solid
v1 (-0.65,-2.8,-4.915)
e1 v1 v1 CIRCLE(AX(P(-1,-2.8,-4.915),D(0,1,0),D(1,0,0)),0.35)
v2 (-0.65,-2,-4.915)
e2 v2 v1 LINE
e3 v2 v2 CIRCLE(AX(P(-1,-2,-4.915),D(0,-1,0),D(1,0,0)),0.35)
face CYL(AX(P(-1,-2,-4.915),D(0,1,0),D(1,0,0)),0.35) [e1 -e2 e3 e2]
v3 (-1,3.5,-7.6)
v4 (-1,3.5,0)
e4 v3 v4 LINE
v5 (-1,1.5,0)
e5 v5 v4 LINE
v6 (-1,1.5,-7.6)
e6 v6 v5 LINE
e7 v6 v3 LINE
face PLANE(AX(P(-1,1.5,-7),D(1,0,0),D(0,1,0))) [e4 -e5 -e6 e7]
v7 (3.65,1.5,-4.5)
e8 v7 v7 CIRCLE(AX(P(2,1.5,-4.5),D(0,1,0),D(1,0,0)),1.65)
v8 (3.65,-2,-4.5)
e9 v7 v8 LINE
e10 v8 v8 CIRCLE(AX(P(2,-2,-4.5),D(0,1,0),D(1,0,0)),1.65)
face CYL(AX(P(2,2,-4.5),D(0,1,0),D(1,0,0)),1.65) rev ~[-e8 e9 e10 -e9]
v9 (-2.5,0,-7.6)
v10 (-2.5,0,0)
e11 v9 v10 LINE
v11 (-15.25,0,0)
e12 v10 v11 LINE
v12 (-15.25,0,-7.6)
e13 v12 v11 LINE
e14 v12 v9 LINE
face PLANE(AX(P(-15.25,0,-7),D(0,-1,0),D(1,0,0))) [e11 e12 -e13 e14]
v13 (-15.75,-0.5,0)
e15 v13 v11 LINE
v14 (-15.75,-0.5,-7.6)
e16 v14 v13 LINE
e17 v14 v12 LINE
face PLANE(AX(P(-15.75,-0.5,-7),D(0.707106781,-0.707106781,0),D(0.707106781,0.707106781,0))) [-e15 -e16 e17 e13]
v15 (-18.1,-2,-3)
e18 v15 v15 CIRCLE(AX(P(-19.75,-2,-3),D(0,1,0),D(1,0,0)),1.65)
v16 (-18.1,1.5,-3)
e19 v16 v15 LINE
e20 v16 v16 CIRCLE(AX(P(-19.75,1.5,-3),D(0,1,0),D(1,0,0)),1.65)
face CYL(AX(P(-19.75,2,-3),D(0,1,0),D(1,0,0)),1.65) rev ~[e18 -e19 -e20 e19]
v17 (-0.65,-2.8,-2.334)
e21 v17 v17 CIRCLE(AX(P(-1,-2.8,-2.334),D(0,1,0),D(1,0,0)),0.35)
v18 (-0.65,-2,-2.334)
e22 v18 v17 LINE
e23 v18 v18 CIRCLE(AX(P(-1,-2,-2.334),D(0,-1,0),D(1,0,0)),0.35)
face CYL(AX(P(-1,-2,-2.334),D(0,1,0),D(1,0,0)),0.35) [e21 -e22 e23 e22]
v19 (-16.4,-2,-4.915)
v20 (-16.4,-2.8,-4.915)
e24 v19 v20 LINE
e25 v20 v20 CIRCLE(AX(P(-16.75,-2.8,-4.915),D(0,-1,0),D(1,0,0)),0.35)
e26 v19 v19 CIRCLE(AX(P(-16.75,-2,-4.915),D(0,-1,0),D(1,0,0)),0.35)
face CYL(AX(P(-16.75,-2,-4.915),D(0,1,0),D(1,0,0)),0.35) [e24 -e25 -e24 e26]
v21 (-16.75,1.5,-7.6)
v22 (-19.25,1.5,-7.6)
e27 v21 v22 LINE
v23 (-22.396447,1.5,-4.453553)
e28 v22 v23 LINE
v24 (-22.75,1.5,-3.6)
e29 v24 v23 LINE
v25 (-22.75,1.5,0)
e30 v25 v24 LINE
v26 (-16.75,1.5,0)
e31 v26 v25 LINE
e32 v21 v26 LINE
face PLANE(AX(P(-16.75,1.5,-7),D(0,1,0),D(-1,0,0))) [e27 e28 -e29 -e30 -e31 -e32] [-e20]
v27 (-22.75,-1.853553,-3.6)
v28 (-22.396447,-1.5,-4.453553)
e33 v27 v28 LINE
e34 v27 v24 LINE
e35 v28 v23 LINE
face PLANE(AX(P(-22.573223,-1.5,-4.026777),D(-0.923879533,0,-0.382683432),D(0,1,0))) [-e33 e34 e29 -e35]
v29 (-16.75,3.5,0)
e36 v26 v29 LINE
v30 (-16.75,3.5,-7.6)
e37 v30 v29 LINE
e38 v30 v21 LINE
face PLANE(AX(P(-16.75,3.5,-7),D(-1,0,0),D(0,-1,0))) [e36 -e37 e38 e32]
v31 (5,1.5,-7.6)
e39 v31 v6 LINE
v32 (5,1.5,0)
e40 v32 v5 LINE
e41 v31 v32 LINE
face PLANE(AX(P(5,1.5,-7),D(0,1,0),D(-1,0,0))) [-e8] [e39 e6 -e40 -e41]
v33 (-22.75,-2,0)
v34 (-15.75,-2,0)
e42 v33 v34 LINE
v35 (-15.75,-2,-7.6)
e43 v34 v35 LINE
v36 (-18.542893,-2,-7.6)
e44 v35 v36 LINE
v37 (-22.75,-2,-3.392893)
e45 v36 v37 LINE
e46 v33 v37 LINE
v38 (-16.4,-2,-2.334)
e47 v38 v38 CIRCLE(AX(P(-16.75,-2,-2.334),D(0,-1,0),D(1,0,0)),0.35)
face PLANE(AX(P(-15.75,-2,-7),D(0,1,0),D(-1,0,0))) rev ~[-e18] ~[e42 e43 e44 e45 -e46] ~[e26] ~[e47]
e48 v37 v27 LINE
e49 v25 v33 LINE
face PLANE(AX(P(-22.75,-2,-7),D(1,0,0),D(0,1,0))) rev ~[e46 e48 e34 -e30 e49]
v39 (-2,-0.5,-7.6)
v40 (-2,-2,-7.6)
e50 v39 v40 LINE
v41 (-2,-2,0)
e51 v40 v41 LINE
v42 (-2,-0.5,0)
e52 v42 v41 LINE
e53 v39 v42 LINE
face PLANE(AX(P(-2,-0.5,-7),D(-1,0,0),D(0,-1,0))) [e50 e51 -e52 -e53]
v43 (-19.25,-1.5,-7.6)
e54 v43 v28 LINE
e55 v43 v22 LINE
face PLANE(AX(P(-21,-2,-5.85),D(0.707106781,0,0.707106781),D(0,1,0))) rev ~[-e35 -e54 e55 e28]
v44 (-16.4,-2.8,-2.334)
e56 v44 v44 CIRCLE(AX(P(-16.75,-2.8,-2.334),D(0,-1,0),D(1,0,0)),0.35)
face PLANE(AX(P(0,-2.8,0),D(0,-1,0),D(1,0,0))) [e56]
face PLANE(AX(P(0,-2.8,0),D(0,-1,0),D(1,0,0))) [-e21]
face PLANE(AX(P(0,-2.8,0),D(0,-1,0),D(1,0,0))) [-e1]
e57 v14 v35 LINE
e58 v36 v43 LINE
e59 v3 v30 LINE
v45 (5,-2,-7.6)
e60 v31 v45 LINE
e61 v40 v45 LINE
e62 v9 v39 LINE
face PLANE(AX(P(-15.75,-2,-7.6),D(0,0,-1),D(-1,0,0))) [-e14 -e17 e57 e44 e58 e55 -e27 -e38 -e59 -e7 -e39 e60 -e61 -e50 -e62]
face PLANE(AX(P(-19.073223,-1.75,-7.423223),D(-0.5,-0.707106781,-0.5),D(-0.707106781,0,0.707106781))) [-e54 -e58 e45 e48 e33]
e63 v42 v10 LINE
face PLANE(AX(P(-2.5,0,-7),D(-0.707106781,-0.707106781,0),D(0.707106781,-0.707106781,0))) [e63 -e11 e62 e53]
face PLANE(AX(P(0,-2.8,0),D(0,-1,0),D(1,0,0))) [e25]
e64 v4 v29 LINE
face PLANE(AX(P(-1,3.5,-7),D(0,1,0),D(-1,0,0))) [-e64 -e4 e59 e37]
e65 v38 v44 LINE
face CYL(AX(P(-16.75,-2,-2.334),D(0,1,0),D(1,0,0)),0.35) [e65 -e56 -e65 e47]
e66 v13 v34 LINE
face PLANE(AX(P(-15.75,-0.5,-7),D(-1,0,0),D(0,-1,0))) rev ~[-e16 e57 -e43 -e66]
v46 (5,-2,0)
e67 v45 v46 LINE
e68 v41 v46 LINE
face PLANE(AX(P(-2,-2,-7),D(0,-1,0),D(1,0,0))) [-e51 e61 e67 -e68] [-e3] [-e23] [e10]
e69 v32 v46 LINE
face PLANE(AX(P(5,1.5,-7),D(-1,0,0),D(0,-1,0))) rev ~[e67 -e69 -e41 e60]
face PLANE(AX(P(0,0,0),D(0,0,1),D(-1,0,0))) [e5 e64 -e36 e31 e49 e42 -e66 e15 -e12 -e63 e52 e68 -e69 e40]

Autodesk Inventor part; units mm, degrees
ref_plane "YZ Plane" through (0, 0, 0) normal (1, 0, 0) x (0, 1, 0)
ref_plane "XZ Plane" through (0, 0, 0) normal (0, 1, 0) x (-1, 0, 0)
ref_plane "XY Plane" through (0, 0, 0) normal (0, 0, 1) x (1, 0, 0)
sketch "Sketch1" plane through (0, 0, 0) normal (0, 1, 0) x (-1, 0, 0)
  line L0 (0, 0) -> (17.75, 0)
  line L1 (17.75, 0) -> (17.75, -7)
  line L2 (17.75, -7) -> (0, -7)
  line L3 (0, -7) -> (0, 0)
  dimension "d0" = 17.75
  dimension "d1" = 7
extrude "Extrusion1" add sketch "Sketch1" along normal blind 2
sketch "Sketch2" plane through (0, 0, 0) normal (0, -1, 0) x (1, 0, 0)
  line L0 (-17.75, 0) -> (0, 0) projected
  line L1 (0, -7) -> (-17.75, -7) projected
  line L2 (0, 0) -> (-2, 0)
  line L3 (-2, 0) -> (-2, -7)
  line L4 (-2, -7) -> (0, -7)
  line L5 (0, -7) -> (0, 0)
  line L6 (-17.75, -7) -> (-17.75, 0) projected
  line L7 (-17.75, 0) -> (-15.75, 0)
  line L8 (-15.75, 0) -> (-15.75, -7)
  line L9 (-15.75, -7) -> (-17.75, -7)
  line L10 (-17.75, -7) -> (-17.75, 0)
  dimension "d4" = 2
  dimension "d5" = 2
extrude "Extrusion2" add sketch "Sketch2" along normal blind 2 contours L0 L8 L1 L6 | L0 L5 L1 L3
sketch "Sketch3" plane through (0, -2, 0) normal (0, -1, 0) x (1, 0, 0)
  line L0 (0, 0) -> (-1, 0)
  line L1 (0, 0) -> (-2, 0) projected
  line L2 (-1, 0) -> (-1, -2.334)
  line L3 (-1, 0) -> (-1, -4.915)
  circle A0 centre (-1, -2.334) radius 0.35
  circle A1 centre (-1, -4.915) radius 0.35
  line L4 (0, 0) -> (0, -7) projected
  line L5 (-17.75, -7) -> (-17.75, 0) projected
  line L6 (0, 0) -> (-17.75, 0)
  line L7 (-15.75, 0) -> (-2, 0) projected
  line L8 (-8.875, 0) -> (-8.875, -0.7455)
  circle A2 centre (-16.75, -2.334) radius 0.35
  circle A3 centre (-16.75, -4.915) radius 0.35
  dimension "d8" = 1
  dimension "d9" = 2.334
  dimension "d10" = 4.915
  dimension "d11" = 0.7
  dimension "d12" = 0.7
extrude "Extrusion3" add sketch "Sketch3" along normal blind 0.8
sketch "Sketch4" plane through (0, 2, -7) normal (0, 0, -1) x (-1, 0, 0)
  line L0 (0, 0) -> (0, -4) projected
  line L1 (0, -4) -> (-4, -4)
  line L2 (-4, -4) -> (-4, -2)
  line L3 (-4, -2) -> (0, -2)
  line L4 (0, -2) -> (0, -4)
  line L5 (17.75, -4) -> (17.75, 0) projected
  line L6 (17.75, -4) -> (21.75, -4)
  line L7 (21.75, -4) -> (21.75, -2)
  line L8 (21.75, -2) -> (17.75, -2)
  line L9 (17.75, -2) -> (17.75, -4)
  dimension "d19" = 4
  dimension "d20" = 2
  dimension "d21" = 4
  dimension "d22" = 2
extrude "Extrusion4" add sketch "Sketch4" against normal blind 7
sketch "Sketch6" plane through (0, 0, -7) normal (0, 1, 0) x (1, 0, 0)
  line L0 (0, -7) -> (0, 0) projected
  line L1 (4, 0) -> (4, -7) projected
  line L2 (0, -7) -> (4, -7)
  line L3 (4, -7) -> (4, 0)
  line L4 (4, 0) -> (0, 0)
  line L5 (0, 0) -> (0, -7)
  line L6 (-15.75, -7) -> (-21.75, -7) projected
  line L7 (0, 0) -> (-17.75, 0) projected
  line L8 (-21.75, -7) -> (-17.75, -7)
  line L9 (-17.75, -7) -> (-17.75, 0)
  line L10 (-17.75, 0) -> (-21.75, 0)
  line L11 (-21.75, 0) -> (-21.75, -7)
extrude "Extrusion5" add sketch "Sketch6" along normal blind 2
sketch "Sketch8" plane through (0, 2, 0) normal (0, 1, 0) x (1, 0, 0)
  line L0 (4, 0) -> (4, 7) projected
  line L1 (4, 0) -> (5, 0)
  line L2 (5, 0) -> (5, 7)
  line L3 (5, 7) -> (4, 7)
  line L4 (4, 7) -> (4, 0)
  line L5 (-21.75, 7) -> (-21.75, 0) projected
  line L6 (-21.75, 0) -> (-22.75, 0)
  line L7 (-22.75, 0) -> (-22.75, 7)
  line L8 (-22.75, 7) -> (-21.75, 7)
  line L9 (-21.75, 7) -> (-21.75, 0)
  point P0 (0, 0)
  dimension "d33" = 1
  dimension "d34" = 1
extrude "Extrusion6" add sketch "Sketch8" against normal blind 4
sketch "Sketch9" plane through (0, 2, 0) normal (0, 1, 0) x (1, 0, 0)
  line L0 (-2, 0) -> (5, 0) projected
  line L1 (5, 0) -> (2, 0)
  line L2 (2, 0) -> (2, 4.5)
  line L3 (2, 4.5) -> (5, 4.5)
  line L4 (5, 4.5) -> (5, 0)
  line L5 (-22.75, 0) -> (5, 0) projected
  line L6 (-22.75, 0) -> (-19.75, 0)
  line L7 (-19.75, 0) -> (-19.75, 3)
  line L8 (-19.75, 3) -> (-22.75, 3)
  line L9 (-22.75, 3) -> (-22.75, 0)
  circle A0 centre (2, 4.5) radius 1.65
  circle A1 centre (-19.75, 3) radius 1.65
  point P0 (0, 0)
  dimension "d37" = 3
  dimension "d38" = 4.5
  dimension "d39" = 3
  dimension "d40" = 3
  dimension "d41" = 3.3
  dimension "d42" = 3.3
extrude "Extrusion7" cut sketch "Sketch9" against normal blind 4 contours A0 L3 L2 | L2 L3 A0 | A1 L8 L7 | L7 L8 A1
sketch "Sketch10" plane through (0, 2, 0) normal (0, 1, 0) x (1, 0, 0)
  line L0 (9.5944, -4.5178) -> (-29.7564, -4.5178)
  line L1 (-29.7564, -4.5178) -> (-29.7564, 11.1864)
  line L2 (-29.7564, 11.1864) -> (9.5944, 11.1864)
  line L3 (9.5944, 11.1864) -> (9.5944, -4.5178)
  point P0 (0, 0)
extrude "Extrusion8" cut sketch "Sketch10" against normal blind 0.5
sketch "Sketch11" plane through (0, 1.5, 0) normal (0, 1, 0) x (1, 0, 0)
  circle A0 centre (2, 4.5) radius 1.65 projected
  line L0 (2, 4.5) -> (-1, 4.5)
  circle A1 centre (-19.75, 3) radius 1.65 projected
  line L1 (-19.75, 3) -> (-16.75, 3)
  line L2 (-16.75, 3) -> (-16.75, 7.7148)
  line L3 (-22.75, 7) -> (5, 7) projected
  line L4 (5, 0) -> (-22.75, 0) projected
  line L5 (-16.75, 7) -> (-1, 7)
  line L6 (-1, 7) -> (-1, 0)
  line L7 (-1, 0) -> (-16.75, 0)
  line L8 (-16.75, 0) -> (-16.75, 7)
  point P0 (0, 0)
  point P1 (-16.75, 0)
  point P2 (-1, 7)
  dimension "d47" = 3
  dimension "d48" = 3
extrude "Extrusion9" add sketch "Sketch11" along normal blind 2 contours L2 L3 L6 L4 L8
chamfer "Chamfer1" distance 0.5 angle 45 2 edges at (-2, 0, -3.5) (-15.75, 0, -3.5)
sketch "Sketch12" plane through (0, -2, 0) normal (0, -1, 0) x (1, 0, 0)
  line L0 (-15.75, 0) -> (-15.75, -7) projected
  line L1 (-15.75, -7) -> (-22.75, -7) projected
  line L2 (-15.75, 0) -> (-17.75, 0)
  line L3 (-17.75, 0) -> (-17.75, -7)
  line L4 (-17.75, -7) -> (-15.75, -7)
  line L5 (-15.75, -7) -> (-15.75, 0)
  line L6 (-22.75, 0) -> (-22.75, -7) projected
  line L7 (-17.75, -7) -> (-22.75, -7)
  line L8 (-22.75, -7) -> (-22.75, 0)
  line L9 (-22.75, 0) -> (-17.75, 0)
  line L10 (-17.75, 0) -> (-17.75, -7)
  point P0 (0, 0)
  dimension "d57" = 2
sketch "Sketch13" plane through (-15.75, -2, -7) normal (0, 0, -1) x (-1, 0, 0)
  line L0 (0, 0) -> (7, 0) projected
  line L1 (1, 3.5) -> (7, 3.5) projected
  line L2 (0, 0) -> (7, 0)
  line L3 (7, 0) -> (7, 3.5)
  line L4 (7, 3.5) -> (0, 3.5)
  line L5 (0, 1.5) -> (0, 0)
  line L6 (-13.75, 0) -> (-20.75, 0) projected
  line L7 (-20.75, 3.5) -> (-20.75, 0) projected
  line L8 (-13.75, 0) -> (-20.75, 0)
  line L9 (-20.75, 0) -> (-20.75, 3.5)
  line L10 (-20.75, 3.5) -> (-13.75, 3.5)
  line L11 (-14.75, 5.5) -> (1, 5.5) projected
  line L12 (-14.75, 5.5) -> (1, 5.5)
  line L13 (1, 5.5) -> (1, 2)
  line L14 (-14.75, 2) -> (-14.75, 5.5)
  line L15 (0, 1.5) -> (-0.5, 2) projected
  line L16 (0, 1.5) -> (-0.5, 2)
  line L17 (-13.75, 1.5) -> (-13.75, 0) projected
  line L18 (-13.25, 2) -> (-13.75, 1.5) projected
  line L19 (-13.75, 1.5) -> (-13.25, 2)
  line L20 (-13.75, 1.5) -> (-13.75, 0)
  line L21 (-0.5, 2) -> (-13.25, 2)
  point P0 (-15.75, 2)
  point P1 (-14.75, 3.5)
extrude "Extrusion10" add sketch "Sketch13" along normal blind 0.6
chamfer "Chamfer3" distance 3.5 angle 45 1 edges at (-22.75, -0.25, -7.6)
chamfer "Chamfer4" distance 0.5 angle 45 1 edges at (-21, -2, -5.85)
chamfer "Chamfer5" distance 0.5 angle 45 1 edges at (-22.75, 0, -4.1)
properties part number "IMU_clamp"
